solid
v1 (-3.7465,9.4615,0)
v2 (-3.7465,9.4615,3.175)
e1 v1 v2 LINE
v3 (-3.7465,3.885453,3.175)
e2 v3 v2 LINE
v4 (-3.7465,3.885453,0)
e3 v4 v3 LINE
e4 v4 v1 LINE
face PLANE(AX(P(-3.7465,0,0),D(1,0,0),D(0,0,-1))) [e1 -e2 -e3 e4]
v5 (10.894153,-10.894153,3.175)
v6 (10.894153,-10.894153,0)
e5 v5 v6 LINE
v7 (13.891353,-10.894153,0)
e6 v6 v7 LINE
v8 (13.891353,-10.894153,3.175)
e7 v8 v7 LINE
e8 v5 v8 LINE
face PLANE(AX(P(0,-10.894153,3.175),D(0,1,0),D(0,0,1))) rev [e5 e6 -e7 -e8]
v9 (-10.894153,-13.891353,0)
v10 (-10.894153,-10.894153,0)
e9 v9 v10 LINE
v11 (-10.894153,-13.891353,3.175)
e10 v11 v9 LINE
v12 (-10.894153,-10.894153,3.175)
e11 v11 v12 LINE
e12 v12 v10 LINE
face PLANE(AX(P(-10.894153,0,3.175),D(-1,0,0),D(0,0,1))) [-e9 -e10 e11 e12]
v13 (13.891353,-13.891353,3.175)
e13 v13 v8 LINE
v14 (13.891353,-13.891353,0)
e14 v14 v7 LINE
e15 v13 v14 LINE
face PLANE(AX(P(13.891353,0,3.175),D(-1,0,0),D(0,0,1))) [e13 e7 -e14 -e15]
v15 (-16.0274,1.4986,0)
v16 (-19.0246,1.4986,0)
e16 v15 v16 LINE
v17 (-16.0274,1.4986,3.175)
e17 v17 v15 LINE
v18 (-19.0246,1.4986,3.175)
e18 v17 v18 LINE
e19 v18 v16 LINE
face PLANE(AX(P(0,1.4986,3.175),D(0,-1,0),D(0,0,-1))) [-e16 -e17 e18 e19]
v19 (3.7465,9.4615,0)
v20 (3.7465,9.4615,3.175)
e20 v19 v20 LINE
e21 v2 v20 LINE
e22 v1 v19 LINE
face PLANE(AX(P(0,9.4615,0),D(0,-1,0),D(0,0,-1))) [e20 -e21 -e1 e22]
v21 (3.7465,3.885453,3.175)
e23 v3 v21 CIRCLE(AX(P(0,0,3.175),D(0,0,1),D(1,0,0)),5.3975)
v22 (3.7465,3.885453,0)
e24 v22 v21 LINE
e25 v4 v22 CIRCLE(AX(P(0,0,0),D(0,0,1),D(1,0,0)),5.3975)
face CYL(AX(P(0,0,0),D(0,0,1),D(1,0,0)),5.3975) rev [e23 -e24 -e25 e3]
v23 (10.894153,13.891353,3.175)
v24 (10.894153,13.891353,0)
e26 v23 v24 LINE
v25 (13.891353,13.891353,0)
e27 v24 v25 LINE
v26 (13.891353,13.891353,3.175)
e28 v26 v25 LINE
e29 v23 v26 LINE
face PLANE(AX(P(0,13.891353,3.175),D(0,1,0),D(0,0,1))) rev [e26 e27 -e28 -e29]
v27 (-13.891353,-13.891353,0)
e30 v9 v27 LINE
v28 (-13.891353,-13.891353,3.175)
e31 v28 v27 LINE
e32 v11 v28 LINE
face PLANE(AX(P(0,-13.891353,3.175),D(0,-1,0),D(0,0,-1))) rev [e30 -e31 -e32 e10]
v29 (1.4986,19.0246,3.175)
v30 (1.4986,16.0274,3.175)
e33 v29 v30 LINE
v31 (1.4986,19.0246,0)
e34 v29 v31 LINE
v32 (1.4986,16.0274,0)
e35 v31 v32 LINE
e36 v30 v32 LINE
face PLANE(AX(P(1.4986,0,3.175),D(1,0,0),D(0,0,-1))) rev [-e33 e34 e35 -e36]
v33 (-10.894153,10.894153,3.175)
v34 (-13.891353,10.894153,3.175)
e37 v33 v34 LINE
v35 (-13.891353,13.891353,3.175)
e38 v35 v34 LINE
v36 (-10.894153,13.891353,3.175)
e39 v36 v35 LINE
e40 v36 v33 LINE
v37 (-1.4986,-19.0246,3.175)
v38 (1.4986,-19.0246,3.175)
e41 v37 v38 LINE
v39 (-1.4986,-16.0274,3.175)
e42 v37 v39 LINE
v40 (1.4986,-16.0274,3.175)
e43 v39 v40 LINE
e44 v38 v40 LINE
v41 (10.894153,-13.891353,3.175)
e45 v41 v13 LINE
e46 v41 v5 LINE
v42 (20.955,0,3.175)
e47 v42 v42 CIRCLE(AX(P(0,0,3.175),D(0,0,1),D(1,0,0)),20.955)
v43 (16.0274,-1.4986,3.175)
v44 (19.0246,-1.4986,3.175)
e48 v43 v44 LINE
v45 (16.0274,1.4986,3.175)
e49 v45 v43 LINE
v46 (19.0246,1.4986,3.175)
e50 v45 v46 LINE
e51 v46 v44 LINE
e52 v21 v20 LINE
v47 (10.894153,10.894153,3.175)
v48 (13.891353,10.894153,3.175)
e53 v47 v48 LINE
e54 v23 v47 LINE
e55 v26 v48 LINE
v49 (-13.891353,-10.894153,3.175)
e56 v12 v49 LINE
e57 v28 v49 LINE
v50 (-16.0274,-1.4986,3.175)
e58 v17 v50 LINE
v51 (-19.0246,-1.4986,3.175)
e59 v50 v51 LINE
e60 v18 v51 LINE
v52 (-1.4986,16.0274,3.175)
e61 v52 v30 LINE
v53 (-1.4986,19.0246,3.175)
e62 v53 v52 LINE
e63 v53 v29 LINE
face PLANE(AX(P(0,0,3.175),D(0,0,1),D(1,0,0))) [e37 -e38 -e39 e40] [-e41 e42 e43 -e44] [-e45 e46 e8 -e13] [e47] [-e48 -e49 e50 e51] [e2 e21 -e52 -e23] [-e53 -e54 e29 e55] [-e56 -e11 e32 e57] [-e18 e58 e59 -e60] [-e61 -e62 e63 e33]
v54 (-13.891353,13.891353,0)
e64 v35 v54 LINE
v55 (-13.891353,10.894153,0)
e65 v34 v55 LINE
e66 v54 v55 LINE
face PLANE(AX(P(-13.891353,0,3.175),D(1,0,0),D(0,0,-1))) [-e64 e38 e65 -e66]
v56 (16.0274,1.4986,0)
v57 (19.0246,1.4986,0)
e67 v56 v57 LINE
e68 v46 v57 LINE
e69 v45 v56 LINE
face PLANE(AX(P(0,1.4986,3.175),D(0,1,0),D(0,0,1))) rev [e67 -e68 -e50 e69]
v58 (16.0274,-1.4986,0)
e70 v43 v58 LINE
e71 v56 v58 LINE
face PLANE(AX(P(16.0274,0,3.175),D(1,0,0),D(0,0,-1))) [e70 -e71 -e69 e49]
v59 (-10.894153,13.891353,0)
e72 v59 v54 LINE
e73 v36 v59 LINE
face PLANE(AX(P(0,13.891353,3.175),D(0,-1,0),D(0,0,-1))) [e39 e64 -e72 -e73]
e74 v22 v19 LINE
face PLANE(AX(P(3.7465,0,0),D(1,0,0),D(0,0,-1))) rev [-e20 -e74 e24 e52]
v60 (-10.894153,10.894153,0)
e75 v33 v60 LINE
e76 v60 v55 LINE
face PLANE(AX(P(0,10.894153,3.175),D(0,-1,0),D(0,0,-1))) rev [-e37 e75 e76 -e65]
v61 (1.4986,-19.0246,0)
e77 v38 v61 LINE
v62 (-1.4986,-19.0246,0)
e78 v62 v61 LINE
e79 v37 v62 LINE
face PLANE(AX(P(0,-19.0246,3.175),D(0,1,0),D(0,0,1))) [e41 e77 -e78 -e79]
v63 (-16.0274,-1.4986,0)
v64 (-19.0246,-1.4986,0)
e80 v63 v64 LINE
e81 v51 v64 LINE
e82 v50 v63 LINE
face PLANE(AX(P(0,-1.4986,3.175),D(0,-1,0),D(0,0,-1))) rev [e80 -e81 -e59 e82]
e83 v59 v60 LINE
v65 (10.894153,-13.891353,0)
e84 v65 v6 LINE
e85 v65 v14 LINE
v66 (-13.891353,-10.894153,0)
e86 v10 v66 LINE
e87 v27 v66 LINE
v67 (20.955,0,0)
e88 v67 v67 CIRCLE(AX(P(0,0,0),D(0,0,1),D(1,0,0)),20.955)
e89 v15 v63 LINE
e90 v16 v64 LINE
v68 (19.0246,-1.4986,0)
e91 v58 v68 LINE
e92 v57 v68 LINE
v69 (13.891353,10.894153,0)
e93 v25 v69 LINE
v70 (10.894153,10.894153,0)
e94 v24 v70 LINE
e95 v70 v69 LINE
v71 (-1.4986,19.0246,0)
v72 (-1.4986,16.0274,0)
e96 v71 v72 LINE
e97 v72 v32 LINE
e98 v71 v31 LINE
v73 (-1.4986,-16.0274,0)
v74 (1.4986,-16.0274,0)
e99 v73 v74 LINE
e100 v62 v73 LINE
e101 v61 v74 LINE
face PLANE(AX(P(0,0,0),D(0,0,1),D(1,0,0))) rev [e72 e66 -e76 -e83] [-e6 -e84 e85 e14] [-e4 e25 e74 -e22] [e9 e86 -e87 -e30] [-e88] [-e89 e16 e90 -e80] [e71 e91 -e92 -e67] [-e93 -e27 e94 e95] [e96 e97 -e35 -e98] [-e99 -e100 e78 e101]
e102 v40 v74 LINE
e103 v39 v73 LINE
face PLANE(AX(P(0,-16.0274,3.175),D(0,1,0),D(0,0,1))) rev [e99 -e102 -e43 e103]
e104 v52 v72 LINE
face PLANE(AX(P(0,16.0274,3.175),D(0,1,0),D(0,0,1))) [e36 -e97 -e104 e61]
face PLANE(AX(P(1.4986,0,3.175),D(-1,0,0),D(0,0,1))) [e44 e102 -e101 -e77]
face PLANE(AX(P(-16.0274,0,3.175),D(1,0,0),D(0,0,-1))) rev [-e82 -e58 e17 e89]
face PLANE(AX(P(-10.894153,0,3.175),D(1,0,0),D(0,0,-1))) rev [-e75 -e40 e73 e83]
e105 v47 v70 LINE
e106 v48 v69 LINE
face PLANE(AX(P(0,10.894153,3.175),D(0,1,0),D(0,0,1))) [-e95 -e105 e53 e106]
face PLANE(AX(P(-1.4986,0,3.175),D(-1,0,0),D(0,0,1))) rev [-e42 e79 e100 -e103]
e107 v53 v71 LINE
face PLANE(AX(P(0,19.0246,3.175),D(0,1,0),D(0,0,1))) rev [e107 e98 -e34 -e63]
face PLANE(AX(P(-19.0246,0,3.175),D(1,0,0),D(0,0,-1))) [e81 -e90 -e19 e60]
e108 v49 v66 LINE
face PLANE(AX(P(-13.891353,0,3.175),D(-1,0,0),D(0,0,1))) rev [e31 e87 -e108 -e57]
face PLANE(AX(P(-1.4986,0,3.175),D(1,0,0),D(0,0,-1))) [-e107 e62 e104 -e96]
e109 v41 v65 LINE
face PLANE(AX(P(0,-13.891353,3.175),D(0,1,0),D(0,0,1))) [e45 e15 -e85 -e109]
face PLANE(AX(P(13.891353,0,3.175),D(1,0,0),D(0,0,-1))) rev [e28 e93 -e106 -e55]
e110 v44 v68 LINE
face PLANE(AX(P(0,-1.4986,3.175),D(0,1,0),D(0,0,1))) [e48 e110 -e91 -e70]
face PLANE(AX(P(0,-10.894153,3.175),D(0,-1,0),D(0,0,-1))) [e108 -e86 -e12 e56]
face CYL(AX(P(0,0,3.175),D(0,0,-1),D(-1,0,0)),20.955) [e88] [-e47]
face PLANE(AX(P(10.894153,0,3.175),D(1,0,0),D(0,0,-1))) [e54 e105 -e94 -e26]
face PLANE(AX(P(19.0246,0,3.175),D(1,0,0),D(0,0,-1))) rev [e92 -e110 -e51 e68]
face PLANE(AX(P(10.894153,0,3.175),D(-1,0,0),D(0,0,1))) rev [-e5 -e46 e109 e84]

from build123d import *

# Parameters (mm, degrees)
SKETCH1_R           = 20.955
SKETCH1_W           = 2.9972
SKETCH1_H           = 2.9972
BOSS_EXTRUDE1_DEPTH = 3.175
CUT_EXTRUDE1_DEPTH  = 3.175


# Read off the part's stored shape, not the designer's step: Cut-Extrude1
with BuildPart() as part:
    # Sketch1 → Boss-Extrude1 (new body)
    with BuildSketch(Plane.XY):
        Circle(SKETCH1_R)
        with Locations((0, 17.526)):
            Rectangle(SKETCH1_W, SKETCH1_H, mode=Mode.SUBTRACT)
        with Locations((0, -17.526)):
            Rectangle(SKETCH1_W, SKETCH1_H, mode=Mode.SUBTRACT)
        with Locations((17.526, 0)):
            Rectangle(SKETCH1_W, SKETCH1_H, mode=Mode.SUBTRACT)
        with Locations((-17.526, 0)):
            Rectangle(SKETCH1_W, SKETCH1_H, mode=Mode.SUBTRACT)
        with Locations((12.392753447, 12.392753447)):
            Rectangle(SKETCH1_W, SKETCH1_H, mode=Mode.SUBTRACT)
        with Locations((-12.392753447, 12.392753447)):
            Rectangle(SKETCH1_W, SKETCH1_H, mode=Mode.SUBTRACT)
        with Locations((-12.392753447, -12.392753447)):
            Rectangle(SKETCH1_W, SKETCH1_H, mode=Mode.SUBTRACT)
        with Locations((12.392753447, -12.392753447)):
            Rectangle(SKETCH1_W, SKETCH1_H, mode=Mode.SUBTRACT)
    extrude(amount=BOSS_EXTRUDE1_DEPTH)

    # Cut-Extrude1 outline → Cut-Extrude1 (cut)
    with BuildSketch(Plane.XY):
        with BuildLine():
            Line((-3.7465, 9.4615), (-3.7465, 3.885452869))
            ThreePointArc((-3.7465, 3.885452869), (0, -5.3975), (3.7465, 3.885452869))
            Line((3.7465, 3.885452869), (3.7465, 9.4615))
            Line((3.7465, 9.4615), (-3.7465, 9.4615))
        make_face()
    extrude(amount=CUT_EXTRUDE1_DEPTH, mode=Mode.SUBTRACT)


solid = part.part
